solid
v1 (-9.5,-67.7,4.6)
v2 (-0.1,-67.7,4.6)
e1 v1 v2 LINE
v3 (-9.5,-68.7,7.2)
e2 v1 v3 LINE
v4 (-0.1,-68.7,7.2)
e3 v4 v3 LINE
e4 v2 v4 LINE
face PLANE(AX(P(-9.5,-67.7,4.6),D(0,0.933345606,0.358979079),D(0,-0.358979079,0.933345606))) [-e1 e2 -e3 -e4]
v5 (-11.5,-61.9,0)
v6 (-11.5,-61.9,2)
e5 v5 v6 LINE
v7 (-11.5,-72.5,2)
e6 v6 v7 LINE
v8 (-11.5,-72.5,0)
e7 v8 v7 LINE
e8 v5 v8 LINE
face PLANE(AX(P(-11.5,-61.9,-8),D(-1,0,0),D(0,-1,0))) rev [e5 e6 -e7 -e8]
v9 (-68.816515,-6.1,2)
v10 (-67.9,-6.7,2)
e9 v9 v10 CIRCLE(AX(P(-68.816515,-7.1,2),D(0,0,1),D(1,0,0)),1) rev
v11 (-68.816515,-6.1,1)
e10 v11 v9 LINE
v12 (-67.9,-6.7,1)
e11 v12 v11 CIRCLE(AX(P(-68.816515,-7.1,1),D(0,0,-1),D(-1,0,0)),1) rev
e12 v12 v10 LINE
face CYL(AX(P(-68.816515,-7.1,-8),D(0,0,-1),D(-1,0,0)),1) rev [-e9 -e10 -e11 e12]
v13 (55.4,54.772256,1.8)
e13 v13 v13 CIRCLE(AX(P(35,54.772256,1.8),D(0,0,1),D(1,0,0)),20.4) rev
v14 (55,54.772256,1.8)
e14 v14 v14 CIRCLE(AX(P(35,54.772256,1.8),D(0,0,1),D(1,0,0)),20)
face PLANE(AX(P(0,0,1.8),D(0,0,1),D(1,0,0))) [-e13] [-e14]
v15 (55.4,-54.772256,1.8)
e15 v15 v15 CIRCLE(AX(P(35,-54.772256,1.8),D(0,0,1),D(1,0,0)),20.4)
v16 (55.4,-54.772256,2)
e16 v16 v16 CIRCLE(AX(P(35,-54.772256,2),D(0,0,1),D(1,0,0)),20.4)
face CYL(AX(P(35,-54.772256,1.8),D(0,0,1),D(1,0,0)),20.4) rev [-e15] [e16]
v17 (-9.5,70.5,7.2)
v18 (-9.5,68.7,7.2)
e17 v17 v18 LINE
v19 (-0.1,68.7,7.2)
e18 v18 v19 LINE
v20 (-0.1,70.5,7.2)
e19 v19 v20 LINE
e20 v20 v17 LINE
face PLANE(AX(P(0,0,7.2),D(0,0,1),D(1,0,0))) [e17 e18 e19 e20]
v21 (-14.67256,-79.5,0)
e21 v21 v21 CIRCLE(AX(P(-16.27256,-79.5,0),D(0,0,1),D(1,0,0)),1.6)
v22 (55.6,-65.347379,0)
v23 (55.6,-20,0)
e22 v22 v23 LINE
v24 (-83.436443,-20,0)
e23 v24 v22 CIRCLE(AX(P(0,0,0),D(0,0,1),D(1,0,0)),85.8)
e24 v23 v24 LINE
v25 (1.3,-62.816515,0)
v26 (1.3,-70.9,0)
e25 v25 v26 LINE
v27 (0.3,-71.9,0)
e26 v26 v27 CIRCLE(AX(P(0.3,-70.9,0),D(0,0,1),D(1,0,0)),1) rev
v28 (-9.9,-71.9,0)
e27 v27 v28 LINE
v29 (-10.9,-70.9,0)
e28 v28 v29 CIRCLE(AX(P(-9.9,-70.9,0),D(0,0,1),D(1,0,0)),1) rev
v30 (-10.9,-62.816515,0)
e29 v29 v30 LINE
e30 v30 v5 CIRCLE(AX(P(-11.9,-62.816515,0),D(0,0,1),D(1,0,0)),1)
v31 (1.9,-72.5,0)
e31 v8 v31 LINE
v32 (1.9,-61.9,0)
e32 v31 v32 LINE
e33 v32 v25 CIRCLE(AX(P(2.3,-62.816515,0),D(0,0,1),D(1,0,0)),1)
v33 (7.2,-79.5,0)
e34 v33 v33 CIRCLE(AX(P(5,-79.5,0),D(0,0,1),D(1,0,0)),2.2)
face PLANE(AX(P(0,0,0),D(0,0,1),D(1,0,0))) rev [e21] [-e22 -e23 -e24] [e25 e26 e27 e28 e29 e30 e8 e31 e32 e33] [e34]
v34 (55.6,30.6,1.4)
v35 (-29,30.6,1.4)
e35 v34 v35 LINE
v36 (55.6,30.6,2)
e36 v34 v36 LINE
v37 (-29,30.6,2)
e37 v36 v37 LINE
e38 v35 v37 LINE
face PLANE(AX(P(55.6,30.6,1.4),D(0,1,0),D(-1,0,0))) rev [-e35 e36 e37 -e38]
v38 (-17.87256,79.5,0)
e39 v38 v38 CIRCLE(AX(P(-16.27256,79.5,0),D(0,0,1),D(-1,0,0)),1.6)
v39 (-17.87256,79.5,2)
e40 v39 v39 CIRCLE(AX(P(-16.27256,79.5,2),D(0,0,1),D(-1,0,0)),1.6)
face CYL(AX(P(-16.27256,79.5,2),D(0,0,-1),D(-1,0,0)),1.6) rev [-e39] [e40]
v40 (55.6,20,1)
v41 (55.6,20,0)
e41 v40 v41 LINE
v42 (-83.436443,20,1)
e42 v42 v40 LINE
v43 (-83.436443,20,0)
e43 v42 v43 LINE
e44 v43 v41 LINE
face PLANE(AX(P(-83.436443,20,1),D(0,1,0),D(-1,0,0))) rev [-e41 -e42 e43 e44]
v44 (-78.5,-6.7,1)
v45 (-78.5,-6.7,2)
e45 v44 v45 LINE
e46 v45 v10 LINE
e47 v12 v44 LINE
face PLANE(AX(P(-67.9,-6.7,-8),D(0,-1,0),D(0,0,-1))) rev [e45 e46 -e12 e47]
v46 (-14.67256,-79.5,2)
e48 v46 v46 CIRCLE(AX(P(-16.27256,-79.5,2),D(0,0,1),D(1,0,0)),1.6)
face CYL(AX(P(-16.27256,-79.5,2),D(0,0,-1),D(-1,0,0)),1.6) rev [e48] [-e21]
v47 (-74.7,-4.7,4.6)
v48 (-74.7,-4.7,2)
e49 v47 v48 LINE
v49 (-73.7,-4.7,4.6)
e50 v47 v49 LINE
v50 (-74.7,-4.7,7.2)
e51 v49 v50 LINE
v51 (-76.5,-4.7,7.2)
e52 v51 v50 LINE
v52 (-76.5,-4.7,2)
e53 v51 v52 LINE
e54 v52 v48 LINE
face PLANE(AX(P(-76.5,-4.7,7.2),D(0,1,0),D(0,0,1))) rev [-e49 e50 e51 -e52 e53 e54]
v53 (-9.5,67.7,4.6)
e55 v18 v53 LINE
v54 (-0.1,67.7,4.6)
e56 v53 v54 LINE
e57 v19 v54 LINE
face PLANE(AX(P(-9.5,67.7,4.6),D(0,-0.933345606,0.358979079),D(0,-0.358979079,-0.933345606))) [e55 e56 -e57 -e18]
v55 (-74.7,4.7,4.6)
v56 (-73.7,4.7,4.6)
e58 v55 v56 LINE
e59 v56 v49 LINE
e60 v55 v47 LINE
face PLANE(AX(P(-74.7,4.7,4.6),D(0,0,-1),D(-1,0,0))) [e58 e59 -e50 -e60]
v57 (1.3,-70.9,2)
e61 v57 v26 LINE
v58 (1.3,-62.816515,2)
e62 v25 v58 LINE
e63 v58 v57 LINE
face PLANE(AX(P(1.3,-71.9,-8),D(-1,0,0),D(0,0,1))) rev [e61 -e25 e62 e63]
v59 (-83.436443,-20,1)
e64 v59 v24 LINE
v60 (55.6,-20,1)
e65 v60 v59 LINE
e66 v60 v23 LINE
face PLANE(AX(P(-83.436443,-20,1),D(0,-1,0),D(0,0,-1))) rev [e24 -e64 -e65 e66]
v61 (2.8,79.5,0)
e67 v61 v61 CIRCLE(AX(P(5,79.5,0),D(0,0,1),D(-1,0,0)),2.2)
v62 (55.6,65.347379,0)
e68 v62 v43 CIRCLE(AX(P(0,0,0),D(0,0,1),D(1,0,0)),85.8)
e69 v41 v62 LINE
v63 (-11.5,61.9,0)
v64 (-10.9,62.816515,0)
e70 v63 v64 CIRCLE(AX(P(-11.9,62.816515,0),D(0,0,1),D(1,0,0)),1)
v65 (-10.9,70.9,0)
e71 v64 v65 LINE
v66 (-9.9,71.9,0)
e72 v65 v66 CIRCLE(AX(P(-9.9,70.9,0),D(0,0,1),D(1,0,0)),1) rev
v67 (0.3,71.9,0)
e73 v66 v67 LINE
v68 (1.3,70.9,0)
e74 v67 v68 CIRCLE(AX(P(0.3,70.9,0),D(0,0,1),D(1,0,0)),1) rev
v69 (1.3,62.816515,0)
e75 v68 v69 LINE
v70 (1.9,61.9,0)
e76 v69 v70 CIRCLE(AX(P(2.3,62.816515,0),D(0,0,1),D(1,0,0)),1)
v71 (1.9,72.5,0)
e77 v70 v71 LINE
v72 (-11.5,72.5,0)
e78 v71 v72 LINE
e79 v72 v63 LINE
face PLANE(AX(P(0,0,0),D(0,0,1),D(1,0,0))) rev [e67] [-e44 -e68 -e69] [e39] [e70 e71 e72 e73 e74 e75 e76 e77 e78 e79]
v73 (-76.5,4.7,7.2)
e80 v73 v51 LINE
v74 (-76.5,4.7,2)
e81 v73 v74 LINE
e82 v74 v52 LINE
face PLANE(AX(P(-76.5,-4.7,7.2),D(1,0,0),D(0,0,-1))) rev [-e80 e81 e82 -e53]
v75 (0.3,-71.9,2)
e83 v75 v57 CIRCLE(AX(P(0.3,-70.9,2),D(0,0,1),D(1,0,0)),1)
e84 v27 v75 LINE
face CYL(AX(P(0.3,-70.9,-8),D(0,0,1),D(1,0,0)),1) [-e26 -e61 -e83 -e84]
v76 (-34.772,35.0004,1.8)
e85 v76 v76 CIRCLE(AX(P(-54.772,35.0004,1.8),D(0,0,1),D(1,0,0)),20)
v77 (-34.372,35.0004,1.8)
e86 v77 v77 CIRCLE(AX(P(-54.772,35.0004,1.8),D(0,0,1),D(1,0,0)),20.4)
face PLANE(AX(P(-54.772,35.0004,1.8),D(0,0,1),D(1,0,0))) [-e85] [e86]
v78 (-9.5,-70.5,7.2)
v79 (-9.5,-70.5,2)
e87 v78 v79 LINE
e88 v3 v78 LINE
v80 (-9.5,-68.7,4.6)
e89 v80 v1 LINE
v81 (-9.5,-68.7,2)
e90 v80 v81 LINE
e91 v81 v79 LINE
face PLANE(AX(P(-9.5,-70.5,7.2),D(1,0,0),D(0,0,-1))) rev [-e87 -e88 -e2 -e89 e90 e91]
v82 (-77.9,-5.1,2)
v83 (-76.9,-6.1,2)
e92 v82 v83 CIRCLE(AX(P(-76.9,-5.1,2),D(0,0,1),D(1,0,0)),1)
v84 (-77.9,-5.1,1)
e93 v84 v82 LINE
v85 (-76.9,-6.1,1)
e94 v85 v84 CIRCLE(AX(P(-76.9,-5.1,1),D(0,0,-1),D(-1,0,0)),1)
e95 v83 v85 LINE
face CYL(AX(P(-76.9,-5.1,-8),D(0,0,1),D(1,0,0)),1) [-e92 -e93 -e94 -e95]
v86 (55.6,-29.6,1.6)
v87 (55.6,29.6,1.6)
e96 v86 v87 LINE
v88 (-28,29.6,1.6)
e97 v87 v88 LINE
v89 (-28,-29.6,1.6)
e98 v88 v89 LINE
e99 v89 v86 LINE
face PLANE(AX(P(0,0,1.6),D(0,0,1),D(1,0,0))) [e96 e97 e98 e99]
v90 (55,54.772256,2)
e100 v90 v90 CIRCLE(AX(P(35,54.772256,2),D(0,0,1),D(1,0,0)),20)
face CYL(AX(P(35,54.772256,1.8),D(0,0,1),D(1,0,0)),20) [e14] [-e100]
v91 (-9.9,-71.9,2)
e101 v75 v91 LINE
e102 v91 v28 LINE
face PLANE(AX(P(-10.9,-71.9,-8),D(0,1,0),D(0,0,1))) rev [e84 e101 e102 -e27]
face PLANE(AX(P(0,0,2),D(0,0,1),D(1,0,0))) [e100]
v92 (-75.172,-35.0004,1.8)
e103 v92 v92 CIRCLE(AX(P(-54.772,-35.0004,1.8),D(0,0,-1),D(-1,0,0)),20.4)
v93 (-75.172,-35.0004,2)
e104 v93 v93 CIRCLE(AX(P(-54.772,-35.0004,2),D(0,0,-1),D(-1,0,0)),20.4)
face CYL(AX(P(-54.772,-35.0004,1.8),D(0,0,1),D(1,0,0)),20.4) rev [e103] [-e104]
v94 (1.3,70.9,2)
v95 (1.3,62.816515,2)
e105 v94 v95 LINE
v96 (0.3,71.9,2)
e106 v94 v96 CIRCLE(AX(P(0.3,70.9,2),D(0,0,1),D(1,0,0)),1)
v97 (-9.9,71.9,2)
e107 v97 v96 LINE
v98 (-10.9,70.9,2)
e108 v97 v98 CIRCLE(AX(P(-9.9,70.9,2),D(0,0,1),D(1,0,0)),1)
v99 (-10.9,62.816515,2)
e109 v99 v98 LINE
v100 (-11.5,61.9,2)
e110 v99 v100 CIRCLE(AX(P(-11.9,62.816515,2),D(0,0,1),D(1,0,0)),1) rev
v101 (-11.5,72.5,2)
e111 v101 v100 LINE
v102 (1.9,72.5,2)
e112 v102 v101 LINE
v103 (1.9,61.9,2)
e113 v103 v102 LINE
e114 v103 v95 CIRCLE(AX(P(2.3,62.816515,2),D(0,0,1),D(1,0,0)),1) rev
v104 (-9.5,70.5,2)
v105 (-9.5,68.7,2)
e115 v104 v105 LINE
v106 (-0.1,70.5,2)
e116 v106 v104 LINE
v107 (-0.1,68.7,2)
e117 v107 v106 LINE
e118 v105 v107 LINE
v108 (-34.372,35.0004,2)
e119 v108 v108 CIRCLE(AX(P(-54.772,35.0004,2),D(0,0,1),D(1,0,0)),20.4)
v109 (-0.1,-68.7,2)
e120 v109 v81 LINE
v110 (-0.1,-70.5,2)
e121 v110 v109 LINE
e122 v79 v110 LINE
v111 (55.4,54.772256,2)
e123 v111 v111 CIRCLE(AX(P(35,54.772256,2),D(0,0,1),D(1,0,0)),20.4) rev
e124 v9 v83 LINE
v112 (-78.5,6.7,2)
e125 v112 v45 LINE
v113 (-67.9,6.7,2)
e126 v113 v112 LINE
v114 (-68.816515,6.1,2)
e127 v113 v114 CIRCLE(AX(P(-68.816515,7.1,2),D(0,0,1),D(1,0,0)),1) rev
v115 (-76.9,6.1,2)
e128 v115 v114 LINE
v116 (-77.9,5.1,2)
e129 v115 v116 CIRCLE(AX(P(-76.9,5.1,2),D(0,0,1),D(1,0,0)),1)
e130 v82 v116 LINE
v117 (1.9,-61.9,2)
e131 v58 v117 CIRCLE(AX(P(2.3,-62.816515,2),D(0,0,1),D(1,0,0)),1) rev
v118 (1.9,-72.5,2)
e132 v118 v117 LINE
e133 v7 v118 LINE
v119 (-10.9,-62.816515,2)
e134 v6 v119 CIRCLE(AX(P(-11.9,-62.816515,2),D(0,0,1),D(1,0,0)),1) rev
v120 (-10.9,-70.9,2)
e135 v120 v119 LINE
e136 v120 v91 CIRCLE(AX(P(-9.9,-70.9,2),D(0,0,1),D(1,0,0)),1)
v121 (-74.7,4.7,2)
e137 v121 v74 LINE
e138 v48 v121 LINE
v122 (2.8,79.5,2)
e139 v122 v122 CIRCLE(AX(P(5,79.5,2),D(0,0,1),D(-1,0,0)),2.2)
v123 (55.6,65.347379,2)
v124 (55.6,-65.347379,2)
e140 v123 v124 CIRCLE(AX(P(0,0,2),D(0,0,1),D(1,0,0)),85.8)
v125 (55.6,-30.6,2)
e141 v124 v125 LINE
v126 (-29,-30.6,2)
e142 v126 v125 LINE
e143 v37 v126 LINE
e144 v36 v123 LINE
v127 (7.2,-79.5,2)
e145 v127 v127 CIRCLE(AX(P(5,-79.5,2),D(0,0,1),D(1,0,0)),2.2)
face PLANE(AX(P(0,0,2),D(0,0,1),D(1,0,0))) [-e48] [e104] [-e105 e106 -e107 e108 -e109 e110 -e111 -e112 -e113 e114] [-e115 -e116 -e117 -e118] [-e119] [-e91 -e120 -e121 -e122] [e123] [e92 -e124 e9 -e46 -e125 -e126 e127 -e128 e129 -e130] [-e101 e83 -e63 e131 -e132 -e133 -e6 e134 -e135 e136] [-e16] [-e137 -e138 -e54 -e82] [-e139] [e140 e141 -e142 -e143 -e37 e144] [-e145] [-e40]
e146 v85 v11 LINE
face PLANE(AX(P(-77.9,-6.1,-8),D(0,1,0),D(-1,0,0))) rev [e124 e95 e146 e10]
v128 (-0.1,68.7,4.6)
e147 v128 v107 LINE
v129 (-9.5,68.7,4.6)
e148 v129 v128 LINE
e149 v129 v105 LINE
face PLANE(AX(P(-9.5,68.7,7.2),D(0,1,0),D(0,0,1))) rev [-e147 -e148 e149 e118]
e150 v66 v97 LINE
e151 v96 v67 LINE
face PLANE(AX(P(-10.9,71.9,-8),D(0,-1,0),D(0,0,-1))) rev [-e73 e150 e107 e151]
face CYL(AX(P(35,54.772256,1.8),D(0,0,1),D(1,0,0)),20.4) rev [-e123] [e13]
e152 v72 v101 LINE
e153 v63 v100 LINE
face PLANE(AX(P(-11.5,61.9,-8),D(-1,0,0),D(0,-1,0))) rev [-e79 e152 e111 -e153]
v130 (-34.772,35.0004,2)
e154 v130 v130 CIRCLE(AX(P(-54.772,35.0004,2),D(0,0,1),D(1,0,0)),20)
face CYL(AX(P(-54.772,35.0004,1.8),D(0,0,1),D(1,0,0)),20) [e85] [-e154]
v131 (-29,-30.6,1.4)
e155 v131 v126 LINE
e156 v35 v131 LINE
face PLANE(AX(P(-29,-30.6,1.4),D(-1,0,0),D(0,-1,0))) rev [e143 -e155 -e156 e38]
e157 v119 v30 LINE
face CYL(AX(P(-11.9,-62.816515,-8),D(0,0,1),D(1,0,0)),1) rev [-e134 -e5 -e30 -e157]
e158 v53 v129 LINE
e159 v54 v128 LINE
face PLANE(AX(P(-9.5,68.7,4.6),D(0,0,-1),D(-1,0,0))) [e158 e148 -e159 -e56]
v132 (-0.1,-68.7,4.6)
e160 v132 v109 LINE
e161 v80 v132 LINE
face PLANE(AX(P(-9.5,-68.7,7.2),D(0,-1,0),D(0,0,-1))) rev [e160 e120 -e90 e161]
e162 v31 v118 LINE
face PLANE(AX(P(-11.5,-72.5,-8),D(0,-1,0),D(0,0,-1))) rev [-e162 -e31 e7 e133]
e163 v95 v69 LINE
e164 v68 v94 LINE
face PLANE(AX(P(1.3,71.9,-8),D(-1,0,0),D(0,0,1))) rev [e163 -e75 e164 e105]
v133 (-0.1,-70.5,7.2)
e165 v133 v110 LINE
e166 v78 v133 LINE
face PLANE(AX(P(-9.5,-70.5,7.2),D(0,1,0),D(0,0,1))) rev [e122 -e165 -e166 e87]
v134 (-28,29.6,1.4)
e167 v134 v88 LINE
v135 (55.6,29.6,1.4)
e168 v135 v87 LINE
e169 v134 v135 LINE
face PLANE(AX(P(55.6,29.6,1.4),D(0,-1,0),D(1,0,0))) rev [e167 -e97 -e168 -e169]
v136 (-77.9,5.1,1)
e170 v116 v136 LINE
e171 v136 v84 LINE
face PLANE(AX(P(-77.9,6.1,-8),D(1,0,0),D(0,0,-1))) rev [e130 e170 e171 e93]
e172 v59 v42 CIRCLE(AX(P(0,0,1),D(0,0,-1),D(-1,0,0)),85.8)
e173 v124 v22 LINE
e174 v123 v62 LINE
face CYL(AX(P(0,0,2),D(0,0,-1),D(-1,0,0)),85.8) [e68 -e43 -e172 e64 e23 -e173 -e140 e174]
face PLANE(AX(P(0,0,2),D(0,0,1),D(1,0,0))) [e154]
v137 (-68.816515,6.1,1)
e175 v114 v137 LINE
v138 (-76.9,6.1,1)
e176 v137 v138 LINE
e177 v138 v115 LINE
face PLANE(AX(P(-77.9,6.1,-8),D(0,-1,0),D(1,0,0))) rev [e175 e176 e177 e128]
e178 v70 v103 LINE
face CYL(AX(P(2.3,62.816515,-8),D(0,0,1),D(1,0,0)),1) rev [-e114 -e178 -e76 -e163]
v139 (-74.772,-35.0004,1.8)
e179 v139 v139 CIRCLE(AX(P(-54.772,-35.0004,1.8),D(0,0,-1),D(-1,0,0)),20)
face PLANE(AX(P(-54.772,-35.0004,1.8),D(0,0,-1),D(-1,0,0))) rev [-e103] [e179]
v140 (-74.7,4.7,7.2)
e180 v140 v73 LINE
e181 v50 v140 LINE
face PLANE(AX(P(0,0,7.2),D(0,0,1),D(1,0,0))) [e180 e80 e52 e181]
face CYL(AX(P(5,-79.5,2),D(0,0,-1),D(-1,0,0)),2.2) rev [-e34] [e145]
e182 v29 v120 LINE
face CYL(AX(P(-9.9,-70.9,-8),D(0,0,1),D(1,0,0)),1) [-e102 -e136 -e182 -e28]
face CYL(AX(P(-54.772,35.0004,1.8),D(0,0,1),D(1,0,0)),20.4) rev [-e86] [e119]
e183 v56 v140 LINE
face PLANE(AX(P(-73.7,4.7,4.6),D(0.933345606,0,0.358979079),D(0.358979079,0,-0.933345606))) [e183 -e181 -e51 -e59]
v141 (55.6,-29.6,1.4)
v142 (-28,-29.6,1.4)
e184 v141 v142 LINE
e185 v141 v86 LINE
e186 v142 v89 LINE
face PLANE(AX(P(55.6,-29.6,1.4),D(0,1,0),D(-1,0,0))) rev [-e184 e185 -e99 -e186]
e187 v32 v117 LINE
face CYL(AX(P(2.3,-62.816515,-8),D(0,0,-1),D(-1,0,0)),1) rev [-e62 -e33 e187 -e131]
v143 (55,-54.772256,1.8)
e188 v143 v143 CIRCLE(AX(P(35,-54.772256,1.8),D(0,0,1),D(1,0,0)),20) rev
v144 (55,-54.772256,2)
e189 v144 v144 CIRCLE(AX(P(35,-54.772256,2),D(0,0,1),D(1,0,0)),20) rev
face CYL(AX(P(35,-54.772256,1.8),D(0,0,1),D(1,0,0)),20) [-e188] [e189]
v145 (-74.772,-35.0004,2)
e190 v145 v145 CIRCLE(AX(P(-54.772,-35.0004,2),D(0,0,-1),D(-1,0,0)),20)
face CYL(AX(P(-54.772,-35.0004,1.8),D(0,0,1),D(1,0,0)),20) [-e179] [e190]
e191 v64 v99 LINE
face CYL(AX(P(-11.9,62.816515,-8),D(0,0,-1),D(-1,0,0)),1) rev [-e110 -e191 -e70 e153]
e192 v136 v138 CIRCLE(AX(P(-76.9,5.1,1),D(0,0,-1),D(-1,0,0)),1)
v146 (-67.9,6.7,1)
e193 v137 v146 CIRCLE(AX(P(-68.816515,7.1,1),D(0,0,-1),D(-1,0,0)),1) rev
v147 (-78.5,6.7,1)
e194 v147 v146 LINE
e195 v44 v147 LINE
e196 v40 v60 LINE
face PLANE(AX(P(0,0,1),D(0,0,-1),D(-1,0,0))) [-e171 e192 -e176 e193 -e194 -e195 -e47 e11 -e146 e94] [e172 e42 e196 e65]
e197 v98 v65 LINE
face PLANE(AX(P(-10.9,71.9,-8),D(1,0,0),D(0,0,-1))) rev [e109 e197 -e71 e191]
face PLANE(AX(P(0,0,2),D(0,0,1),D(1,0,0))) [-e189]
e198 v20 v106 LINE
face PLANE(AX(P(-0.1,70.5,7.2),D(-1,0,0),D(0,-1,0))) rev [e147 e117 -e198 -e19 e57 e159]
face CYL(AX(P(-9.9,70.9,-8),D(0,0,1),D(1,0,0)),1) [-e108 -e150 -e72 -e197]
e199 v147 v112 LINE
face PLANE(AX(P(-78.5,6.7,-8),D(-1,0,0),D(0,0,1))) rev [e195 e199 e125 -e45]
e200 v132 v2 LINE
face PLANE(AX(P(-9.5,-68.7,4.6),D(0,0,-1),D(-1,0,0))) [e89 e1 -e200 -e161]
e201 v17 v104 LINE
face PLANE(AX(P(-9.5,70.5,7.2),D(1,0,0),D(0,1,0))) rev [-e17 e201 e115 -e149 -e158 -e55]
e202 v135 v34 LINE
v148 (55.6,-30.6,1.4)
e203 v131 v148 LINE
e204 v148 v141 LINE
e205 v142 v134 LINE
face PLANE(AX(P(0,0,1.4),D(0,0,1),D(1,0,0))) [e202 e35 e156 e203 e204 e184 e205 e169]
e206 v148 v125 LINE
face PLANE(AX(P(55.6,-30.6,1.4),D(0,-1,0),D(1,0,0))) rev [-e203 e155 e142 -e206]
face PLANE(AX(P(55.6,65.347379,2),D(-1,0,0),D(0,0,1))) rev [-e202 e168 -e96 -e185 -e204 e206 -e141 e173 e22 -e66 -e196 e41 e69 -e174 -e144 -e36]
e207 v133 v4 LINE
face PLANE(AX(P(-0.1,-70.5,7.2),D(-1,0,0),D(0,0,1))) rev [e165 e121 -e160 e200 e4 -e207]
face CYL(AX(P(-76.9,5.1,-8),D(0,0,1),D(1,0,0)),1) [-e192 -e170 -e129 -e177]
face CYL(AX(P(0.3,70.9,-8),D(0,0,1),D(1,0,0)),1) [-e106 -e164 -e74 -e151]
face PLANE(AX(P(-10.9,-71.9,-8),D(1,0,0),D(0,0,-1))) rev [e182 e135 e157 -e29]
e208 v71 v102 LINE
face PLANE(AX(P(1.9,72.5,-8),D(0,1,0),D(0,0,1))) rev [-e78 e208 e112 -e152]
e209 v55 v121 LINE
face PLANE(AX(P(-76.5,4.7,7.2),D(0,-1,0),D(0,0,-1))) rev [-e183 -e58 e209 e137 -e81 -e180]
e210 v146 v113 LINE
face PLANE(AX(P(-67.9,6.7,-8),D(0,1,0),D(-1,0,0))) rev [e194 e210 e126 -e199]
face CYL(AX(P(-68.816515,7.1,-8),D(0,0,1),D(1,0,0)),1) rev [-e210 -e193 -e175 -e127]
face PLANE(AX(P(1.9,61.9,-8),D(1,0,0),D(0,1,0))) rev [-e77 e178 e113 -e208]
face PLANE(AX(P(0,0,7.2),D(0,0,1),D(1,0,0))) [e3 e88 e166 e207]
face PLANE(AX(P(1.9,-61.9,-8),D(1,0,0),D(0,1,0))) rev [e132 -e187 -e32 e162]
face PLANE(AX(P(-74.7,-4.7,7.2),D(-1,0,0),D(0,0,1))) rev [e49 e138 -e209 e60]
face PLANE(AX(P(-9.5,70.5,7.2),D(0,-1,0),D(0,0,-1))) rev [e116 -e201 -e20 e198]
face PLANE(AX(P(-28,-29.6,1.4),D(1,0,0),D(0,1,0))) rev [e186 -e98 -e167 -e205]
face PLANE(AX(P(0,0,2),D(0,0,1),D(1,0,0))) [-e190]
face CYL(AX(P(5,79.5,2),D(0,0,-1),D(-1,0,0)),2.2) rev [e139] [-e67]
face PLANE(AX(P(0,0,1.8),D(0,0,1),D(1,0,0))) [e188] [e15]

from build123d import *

# Parameters (mm, degrees)
SKETCH1_R           = 2.2
SKETCH1_R_2         = 1.6
BOSS_EXTRUDE1_DEPTH = 2
SKETCH3_R           = 20.4
SKETCH3_R_2         = 20
CUT_EXTRUDE9_DEPTH  = 0.2
SKETCH6_W           = 9.4
SKETCH6_H           = 1.8
BOSS_EXTRUDE2_DEPTH = 5.2
SKETCH7_W           = 1.8
SKETCH7_H           = 9.4
BOSS_EXTRUDE3_DEPTH = 5.2
BOSS_EXTRUDE4_DEPTH = 9.4
CUT_EXTRUDE10_DEPTH = 0.6
SKETCH11_W          = 83.6
SKETCH11_H          = 59.2
CUT_EXTRUDE11_DEPTH = 0.4
BOSS_EXTRUDE5_DEPTH = 9.4
CUT_EXTRUDE12_DEPTH = 1
CUT_EXTRUDE13_DEPTH = 10
FILLET1_R           = 1
FILLET4_R           = 1
FILLET8_R           = 1
FILLET9_R           = 1
FILLET10_R          = 1


with BuildPart() as part:
    # Sketch1 → Boss-Extrude1 (new body)
    with BuildSketch(Plane(origin=(0, 0, 0), x_dir=(0, 1, 0), z_dir=(0, 0, 1))):
        with BuildLine():
            Line((65.347379442, -55.6), (-65.347379442, -55.6))
            ThreePointArc((-65.347379442, -55.6), (0, 85.8), (65.347379442, -55.6))
        make_face()
        with Locations(Location((-79.5, -5, 0), (0, 0, 270))):
            Circle(SKETCH1_R, mode=Mode.SUBTRACT)
        with Locations(Location((-79.5, 16.27256024, 0), (0, 0, 270))):
            Circle(SKETCH1_R_2, mode=Mode.SUBTRACT)
        with Locations(Location((79.5, 16.27256024, 0), (0, 0, 90))):
            Circle(SKETCH1_R_2, mode=Mode.SUBTRACT)
        with Locations(Location((79.5, -5, 0), (0, 0, 90))):
            Circle(SKETCH1_R, mode=Mode.SUBTRACT)
    extrude(amount=BOSS_EXTRUDE1_DEPTH)

    # Sketch3 → Cut-Extrude9 (cut)
    # profile 1 of 4: a face of its own
    with BuildSketch(Plane.XY.offset(2)):
        with Locations((-54.772, 35.000400226)):
            Circle(SKETCH3_R)
        with Locations((-54.772, 35.000400226)):
            Circle(SKETCH3_R_2, mode=Mode.SUBTRACT)
    # profile 2 of 4: a face of its own
    with BuildSketch(Plane.XY.offset(2)):
        with Locations(Location((-54.772, -35.000400226, 0), (0, 0, 180))):
            Circle(SKETCH3_R)
        with Locations(Location((-54.772, -35.000400226, 0), (0, 0, 180))):
            Circle(SKETCH3_R_2, mode=Mode.SUBTRACT)
    # profile 3 of 4: a face of its own
    with BuildSketch(Plane.XY.offset(2)):
        with Locations((35, -54.772255751)):
            Circle(SKETCH3_R)
        with Locations((35, -54.772255751)):
            Circle(SKETCH3_R_2, mode=Mode.SUBTRACT)
    # profile 4 of 4: a face of its own
    with BuildSketch(Plane.XY.offset(2)):
        with Locations((35, 54.772255751)):
            Circle(SKETCH3_R)
        with Locations((35, 54.772255751)):
            Circle(SKETCH3_R_2, mode=Mode.SUBTRACT)
    extrude(amount=-CUT_EXTRUDE9_DEPTH, mode=Mode.SUBTRACT)

    # Sketch6 → Boss-Extrude2 (add)
    with BuildSketch(Plane.XY.offset(2)):
        with Locations((-4.8, -69.6)):
            Rectangle(SKETCH6_W, SKETCH6_H)
        with Locations((-4.8, 69.6)):
            Rectangle(SKETCH6_W, SKETCH6_H)
    extrude(amount=BOSS_EXTRUDE2_DEPTH)

    # Sketch7 → Boss-Extrude3 (add)
    with BuildSketch(Plane.XY.offset(2)):
        with Locations((-75.6, 0)):
            Rectangle(SKETCH7_W, SKETCH7_H)
    extrude(amount=BOSS_EXTRUDE3_DEPTH)

    # Sketch8 → Boss-Extrude4 (add)
    with BuildSketch(Plane.YZ.offset(-0.1)):
        Polygon((-68.7, 7.2), (-68.7, 4.6), (-67.7, 4.6), align=None)
        Polygon((67.7, 4.6), (68.7, 7.2), (68.7, 4.6), align=None)
    extrude(amount=-BOSS_EXTRUDE4_DEPTH)

    # Sketch10 → Cut-Extrude10 (cut)
    with BuildSketch(Plane.XY.offset(2)):
        Polygon((55.6, -29.6), (-28, -29.6), (-28, 29.6), (55.6, 29.6), (55.6, 30.6), (-29, 30.6), (-29, -30.6), (55.6, -30.6), align=None)
    extrude(amount=-CUT_EXTRUDE10_DEPTH, mode=Mode.SUBTRACT)

    # Sketch11 → Cut-Extrude11 (cut)
    with BuildSketch(Plane.XY.offset(2)):
        with Locations((13.8, 0)):
            Rectangle(SKETCH11_W, SKETCH11_H)
    extrude(amount=-CUT_EXTRUDE11_DEPTH, mode=Mode.SUBTRACT)

    # Sketch13 → Boss-Extrude5 (add)
    with BuildSketch(Plane.XZ.offset(4.7)):
        Polygon((-74.7, 7.2), (-74.7, 4.6), (-73.7, 4.6), align=None)
    extrude(amount=-BOSS_EXTRUDE5_DEPTH)

    # Sketch15 → Cut-Extrude12 (cut)
    with BuildSketch(Plane(origin=(0, 0, 0), x_dir=(1, 0, 0), z_dir=(0, 0, -1))):
        with BuildLine():
            Line((-83.436442877, 20), (55.6, 20))
            Line((55.6, 20), (55.6, -20))
            Line((55.6, -20), (-83.436442877, -20))
            ThreePointArc((-83.436442877, -20), (-85.8, 0), (-83.436442877, 20))
        make_face()
    extrude(amount=-CUT_EXTRUDE12_DEPTH, mode=Mode.SUBTRACT)

    # Sketch17 → Cut-Extrude13 (cut)
    with BuildSketch(Plane.XY.offset(2)):
        Polygon((-10.9, -71.9), (-10.9, -61.9), (-11.5, -61.9), (-11.5, -72.5), (1.9, -72.5), (1.9, -61.9), (1.3, -61.9), (1.3, -71.9), align=None)
        Polygon((1.9, 72.5), (-11.5, 72.5), (-11.5, 61.9), (-10.9, 61.9), (-10.9, 71.9), (1.3, 71.9), (1.3, 61.9), (1.9, 61.9), align=None)
        Polygon((-78.5, 6.7), (-78.5, -6.7), (-67.9, -6.7), (-67.9, -6.1), (-77.9, -6.1), (-77.9, 6.1), (-67.9, 6.1), (-67.9, 6.7), align=None)
    extrude(amount=-CUT_EXTRUDE13_DEPTH, mode=Mode.SUBTRACT)

    # Fillet1
    fillet1_edges = [part.edges().sort_by_distance(p)[0] for p in [
        (-10.9, -71.9, 1),
    ]]
    fillet(fillet1_edges, radius=FILLET1_R)

    # Fillet4
    # the kernel refuses this fillet: 1 mm, written as the material it adds along each edge
    with BuildSketch(Plane(origin=(1.3, -61.9, 2), x_dir=(0, -1, 0), z_dir=(0, 0, -1))) as fillet4_piece_1:
        with BuildLine():
            CenterArc((0.916515139, -1), FILLET4_R, 90, 66.421821522)
            Line((0, -0.6), (0, 0))
            Line((0, 0), (0.916515139, 0))
        make_face()
    extrude(amount=2)
    # the kernel refuses this fillet: 1 mm, written as the material it takes off along each edge
    with BuildSketch(Plane(origin=(1.3, -71.9, 4.5), x_dir=(-1, 0, 0), z_dir=(0, 0, -1))) as fillet4_2_piece_1:
        with BuildLine():
            CenterArc((FILLET4_R, FILLET4_R), FILLET4_R, 180, 90)
            Line((0, FILLET4_R), (0, 0))
            Line((0, 0), (FILLET4_R, 0))
        make_face()
    extrude(amount=7, mode=Mode.SUBTRACT)

    # Fillet8
    # the kernel refuses this fillet: 1 mm, written as the material it adds along each edge
    with BuildSketch(Plane(origin=(-10.9, -61.9, 2), x_dir=(0, -1, 0), z_dir=(0, 0, -1))) as fillet8_piece_1:
        with BuildLine():
            CenterArc((0.916515139, 1), FILLET8_R, 203.578178478, 66.421821522)
            Line((0, 0.6), (-0.018330303, 0.592))
            ThreePointArc((-0.018330303, 0.592), (-0.02, 0.3), (-0.02, 0))
            Line((-0.02, 0), (0, -0.02))
            Line((0, -0.02), (0.916515139, -0.02))
            Line((0.916515139, -0.02), (0.916515139, 0))
        make_face()
    extrude(amount=2)

    # Fillet9
    # the kernel refuses this fillet: 1 mm, written as the material it adds along each edge
    with BuildSketch(Plane(origin=(-10.9, 61.9, 2), x_dir=(-1, 0, 0), z_dir=(0, 0, -1))) as fillet9_piece_1:
        with BuildLine():
            CenterArc((1, 0.916515139), FILLET9_R, 180, 66.421821522)
            Line((0, 0.916515139), (0, 0))
            Line((0, 0), (0.6, 0))
        make_face()
    extrude(amount=2)
    with BuildSketch(Plane(origin=(1.3, 61.9, 2), x_dir=(1, 0, 0), z_dir=(0, 0, -1))) as fillet9_piece_2:
        with BuildLine():
            CenterArc((1, -0.916515139), FILLET9_R, 113.578178478, 66.421821522)
            Line((0, -0.916515139), (0, 0))
            Line((0, 0), (0.6, 0))
        make_face()
    extrude(amount=2)
    # the kernel refuses this fillet: 1 mm, written as the material it takes off along each edge
    with BuildSketch(Plane(origin=(1.3, 71.9, 4.5), x_dir=(0, -1, 0), z_dir=(0, 0, -1)), Plane(origin=(-10.9, 71.9, 4.5), x_dir=(1, 0, 0), z_dir=(0, 0, -1))) as fillet9_2_piece_1:
        with BuildLine():
            CenterArc((FILLET9_R, FILLET9_R), FILLET9_R, 180, 90)
            Line((0, FILLET9_R), (0, 0))
            Line((0, 0), (FILLET9_R, 0))
        make_face()
    extrude(amount=7, mode=Mode.SUBTRACT)

    # Fillet10
    # the kernel refuses this fillet: 1 mm, written as the material it adds along each edge
    with BuildSketch(Plane(origin=(-67.9, -6.1, 2), x_dir=(0, -1, 0), z_dir=(0, 0, -1))) as fillet10_piece_1:
        with BuildLine():
            CenterArc((1, 0.916515139), FILLET10_R, 180, 66.421821522)
            Line((0, 0.916515139), (0, 0))
            Line((0, 0), (0.6, 0))
        make_face()
    extrude(amount=1)
    with BuildSketch(Plane(origin=(-67.9, 6.1, 2), x_dir=(0, 1, 0), z_dir=(0, 0, -1))) as fillet10_piece_2:
        with BuildLine():
            CenterArc((1, -0.916515139), FILLET10_R, 113.578178478, 66.421821522)
            Line((0, -0.916515139), (0, 0))
            Line((0, 0), (0.6, 0))
        make_face()
    extrude(amount=1)
    # the kernel refuses this fillet: 1 mm, written as the material it takes off along each edge
    with BuildSketch(Plane(origin=(-77.9, -6.1, 4.5), x_dir=(1, 0, 0), z_dir=(0, 0, -1))) as fillet10_2_piece_1:
        with BuildLine():
            CenterArc((FILLET10_R, -FILLET10_R), FILLET10_R, 90, 90)
            Line((0, -FILLET10_R), (0, 0))
            Line((0, 0), (FILLET10_R, 0))
        make_face()
    extrude(amount=6, mode=Mode.SUBTRACT)
    with BuildSketch(Plane(origin=(-77.9, 6.1, 4.5), x_dir=(1, 0, 0), z_dir=(0, 0, -1))) as fillet10_2_piece_2:
        with BuildLine():
            CenterArc((FILLET10_R, FILLET10_R), FILLET10_R, 180, 90)
            Line((0, FILLET10_R), (0, 0))
            Line((0, 0), (FILLET10_R, 0))
        make_face()
    extrude(amount=6, mode=Mode.SUBTRACT)


solid = part.part
